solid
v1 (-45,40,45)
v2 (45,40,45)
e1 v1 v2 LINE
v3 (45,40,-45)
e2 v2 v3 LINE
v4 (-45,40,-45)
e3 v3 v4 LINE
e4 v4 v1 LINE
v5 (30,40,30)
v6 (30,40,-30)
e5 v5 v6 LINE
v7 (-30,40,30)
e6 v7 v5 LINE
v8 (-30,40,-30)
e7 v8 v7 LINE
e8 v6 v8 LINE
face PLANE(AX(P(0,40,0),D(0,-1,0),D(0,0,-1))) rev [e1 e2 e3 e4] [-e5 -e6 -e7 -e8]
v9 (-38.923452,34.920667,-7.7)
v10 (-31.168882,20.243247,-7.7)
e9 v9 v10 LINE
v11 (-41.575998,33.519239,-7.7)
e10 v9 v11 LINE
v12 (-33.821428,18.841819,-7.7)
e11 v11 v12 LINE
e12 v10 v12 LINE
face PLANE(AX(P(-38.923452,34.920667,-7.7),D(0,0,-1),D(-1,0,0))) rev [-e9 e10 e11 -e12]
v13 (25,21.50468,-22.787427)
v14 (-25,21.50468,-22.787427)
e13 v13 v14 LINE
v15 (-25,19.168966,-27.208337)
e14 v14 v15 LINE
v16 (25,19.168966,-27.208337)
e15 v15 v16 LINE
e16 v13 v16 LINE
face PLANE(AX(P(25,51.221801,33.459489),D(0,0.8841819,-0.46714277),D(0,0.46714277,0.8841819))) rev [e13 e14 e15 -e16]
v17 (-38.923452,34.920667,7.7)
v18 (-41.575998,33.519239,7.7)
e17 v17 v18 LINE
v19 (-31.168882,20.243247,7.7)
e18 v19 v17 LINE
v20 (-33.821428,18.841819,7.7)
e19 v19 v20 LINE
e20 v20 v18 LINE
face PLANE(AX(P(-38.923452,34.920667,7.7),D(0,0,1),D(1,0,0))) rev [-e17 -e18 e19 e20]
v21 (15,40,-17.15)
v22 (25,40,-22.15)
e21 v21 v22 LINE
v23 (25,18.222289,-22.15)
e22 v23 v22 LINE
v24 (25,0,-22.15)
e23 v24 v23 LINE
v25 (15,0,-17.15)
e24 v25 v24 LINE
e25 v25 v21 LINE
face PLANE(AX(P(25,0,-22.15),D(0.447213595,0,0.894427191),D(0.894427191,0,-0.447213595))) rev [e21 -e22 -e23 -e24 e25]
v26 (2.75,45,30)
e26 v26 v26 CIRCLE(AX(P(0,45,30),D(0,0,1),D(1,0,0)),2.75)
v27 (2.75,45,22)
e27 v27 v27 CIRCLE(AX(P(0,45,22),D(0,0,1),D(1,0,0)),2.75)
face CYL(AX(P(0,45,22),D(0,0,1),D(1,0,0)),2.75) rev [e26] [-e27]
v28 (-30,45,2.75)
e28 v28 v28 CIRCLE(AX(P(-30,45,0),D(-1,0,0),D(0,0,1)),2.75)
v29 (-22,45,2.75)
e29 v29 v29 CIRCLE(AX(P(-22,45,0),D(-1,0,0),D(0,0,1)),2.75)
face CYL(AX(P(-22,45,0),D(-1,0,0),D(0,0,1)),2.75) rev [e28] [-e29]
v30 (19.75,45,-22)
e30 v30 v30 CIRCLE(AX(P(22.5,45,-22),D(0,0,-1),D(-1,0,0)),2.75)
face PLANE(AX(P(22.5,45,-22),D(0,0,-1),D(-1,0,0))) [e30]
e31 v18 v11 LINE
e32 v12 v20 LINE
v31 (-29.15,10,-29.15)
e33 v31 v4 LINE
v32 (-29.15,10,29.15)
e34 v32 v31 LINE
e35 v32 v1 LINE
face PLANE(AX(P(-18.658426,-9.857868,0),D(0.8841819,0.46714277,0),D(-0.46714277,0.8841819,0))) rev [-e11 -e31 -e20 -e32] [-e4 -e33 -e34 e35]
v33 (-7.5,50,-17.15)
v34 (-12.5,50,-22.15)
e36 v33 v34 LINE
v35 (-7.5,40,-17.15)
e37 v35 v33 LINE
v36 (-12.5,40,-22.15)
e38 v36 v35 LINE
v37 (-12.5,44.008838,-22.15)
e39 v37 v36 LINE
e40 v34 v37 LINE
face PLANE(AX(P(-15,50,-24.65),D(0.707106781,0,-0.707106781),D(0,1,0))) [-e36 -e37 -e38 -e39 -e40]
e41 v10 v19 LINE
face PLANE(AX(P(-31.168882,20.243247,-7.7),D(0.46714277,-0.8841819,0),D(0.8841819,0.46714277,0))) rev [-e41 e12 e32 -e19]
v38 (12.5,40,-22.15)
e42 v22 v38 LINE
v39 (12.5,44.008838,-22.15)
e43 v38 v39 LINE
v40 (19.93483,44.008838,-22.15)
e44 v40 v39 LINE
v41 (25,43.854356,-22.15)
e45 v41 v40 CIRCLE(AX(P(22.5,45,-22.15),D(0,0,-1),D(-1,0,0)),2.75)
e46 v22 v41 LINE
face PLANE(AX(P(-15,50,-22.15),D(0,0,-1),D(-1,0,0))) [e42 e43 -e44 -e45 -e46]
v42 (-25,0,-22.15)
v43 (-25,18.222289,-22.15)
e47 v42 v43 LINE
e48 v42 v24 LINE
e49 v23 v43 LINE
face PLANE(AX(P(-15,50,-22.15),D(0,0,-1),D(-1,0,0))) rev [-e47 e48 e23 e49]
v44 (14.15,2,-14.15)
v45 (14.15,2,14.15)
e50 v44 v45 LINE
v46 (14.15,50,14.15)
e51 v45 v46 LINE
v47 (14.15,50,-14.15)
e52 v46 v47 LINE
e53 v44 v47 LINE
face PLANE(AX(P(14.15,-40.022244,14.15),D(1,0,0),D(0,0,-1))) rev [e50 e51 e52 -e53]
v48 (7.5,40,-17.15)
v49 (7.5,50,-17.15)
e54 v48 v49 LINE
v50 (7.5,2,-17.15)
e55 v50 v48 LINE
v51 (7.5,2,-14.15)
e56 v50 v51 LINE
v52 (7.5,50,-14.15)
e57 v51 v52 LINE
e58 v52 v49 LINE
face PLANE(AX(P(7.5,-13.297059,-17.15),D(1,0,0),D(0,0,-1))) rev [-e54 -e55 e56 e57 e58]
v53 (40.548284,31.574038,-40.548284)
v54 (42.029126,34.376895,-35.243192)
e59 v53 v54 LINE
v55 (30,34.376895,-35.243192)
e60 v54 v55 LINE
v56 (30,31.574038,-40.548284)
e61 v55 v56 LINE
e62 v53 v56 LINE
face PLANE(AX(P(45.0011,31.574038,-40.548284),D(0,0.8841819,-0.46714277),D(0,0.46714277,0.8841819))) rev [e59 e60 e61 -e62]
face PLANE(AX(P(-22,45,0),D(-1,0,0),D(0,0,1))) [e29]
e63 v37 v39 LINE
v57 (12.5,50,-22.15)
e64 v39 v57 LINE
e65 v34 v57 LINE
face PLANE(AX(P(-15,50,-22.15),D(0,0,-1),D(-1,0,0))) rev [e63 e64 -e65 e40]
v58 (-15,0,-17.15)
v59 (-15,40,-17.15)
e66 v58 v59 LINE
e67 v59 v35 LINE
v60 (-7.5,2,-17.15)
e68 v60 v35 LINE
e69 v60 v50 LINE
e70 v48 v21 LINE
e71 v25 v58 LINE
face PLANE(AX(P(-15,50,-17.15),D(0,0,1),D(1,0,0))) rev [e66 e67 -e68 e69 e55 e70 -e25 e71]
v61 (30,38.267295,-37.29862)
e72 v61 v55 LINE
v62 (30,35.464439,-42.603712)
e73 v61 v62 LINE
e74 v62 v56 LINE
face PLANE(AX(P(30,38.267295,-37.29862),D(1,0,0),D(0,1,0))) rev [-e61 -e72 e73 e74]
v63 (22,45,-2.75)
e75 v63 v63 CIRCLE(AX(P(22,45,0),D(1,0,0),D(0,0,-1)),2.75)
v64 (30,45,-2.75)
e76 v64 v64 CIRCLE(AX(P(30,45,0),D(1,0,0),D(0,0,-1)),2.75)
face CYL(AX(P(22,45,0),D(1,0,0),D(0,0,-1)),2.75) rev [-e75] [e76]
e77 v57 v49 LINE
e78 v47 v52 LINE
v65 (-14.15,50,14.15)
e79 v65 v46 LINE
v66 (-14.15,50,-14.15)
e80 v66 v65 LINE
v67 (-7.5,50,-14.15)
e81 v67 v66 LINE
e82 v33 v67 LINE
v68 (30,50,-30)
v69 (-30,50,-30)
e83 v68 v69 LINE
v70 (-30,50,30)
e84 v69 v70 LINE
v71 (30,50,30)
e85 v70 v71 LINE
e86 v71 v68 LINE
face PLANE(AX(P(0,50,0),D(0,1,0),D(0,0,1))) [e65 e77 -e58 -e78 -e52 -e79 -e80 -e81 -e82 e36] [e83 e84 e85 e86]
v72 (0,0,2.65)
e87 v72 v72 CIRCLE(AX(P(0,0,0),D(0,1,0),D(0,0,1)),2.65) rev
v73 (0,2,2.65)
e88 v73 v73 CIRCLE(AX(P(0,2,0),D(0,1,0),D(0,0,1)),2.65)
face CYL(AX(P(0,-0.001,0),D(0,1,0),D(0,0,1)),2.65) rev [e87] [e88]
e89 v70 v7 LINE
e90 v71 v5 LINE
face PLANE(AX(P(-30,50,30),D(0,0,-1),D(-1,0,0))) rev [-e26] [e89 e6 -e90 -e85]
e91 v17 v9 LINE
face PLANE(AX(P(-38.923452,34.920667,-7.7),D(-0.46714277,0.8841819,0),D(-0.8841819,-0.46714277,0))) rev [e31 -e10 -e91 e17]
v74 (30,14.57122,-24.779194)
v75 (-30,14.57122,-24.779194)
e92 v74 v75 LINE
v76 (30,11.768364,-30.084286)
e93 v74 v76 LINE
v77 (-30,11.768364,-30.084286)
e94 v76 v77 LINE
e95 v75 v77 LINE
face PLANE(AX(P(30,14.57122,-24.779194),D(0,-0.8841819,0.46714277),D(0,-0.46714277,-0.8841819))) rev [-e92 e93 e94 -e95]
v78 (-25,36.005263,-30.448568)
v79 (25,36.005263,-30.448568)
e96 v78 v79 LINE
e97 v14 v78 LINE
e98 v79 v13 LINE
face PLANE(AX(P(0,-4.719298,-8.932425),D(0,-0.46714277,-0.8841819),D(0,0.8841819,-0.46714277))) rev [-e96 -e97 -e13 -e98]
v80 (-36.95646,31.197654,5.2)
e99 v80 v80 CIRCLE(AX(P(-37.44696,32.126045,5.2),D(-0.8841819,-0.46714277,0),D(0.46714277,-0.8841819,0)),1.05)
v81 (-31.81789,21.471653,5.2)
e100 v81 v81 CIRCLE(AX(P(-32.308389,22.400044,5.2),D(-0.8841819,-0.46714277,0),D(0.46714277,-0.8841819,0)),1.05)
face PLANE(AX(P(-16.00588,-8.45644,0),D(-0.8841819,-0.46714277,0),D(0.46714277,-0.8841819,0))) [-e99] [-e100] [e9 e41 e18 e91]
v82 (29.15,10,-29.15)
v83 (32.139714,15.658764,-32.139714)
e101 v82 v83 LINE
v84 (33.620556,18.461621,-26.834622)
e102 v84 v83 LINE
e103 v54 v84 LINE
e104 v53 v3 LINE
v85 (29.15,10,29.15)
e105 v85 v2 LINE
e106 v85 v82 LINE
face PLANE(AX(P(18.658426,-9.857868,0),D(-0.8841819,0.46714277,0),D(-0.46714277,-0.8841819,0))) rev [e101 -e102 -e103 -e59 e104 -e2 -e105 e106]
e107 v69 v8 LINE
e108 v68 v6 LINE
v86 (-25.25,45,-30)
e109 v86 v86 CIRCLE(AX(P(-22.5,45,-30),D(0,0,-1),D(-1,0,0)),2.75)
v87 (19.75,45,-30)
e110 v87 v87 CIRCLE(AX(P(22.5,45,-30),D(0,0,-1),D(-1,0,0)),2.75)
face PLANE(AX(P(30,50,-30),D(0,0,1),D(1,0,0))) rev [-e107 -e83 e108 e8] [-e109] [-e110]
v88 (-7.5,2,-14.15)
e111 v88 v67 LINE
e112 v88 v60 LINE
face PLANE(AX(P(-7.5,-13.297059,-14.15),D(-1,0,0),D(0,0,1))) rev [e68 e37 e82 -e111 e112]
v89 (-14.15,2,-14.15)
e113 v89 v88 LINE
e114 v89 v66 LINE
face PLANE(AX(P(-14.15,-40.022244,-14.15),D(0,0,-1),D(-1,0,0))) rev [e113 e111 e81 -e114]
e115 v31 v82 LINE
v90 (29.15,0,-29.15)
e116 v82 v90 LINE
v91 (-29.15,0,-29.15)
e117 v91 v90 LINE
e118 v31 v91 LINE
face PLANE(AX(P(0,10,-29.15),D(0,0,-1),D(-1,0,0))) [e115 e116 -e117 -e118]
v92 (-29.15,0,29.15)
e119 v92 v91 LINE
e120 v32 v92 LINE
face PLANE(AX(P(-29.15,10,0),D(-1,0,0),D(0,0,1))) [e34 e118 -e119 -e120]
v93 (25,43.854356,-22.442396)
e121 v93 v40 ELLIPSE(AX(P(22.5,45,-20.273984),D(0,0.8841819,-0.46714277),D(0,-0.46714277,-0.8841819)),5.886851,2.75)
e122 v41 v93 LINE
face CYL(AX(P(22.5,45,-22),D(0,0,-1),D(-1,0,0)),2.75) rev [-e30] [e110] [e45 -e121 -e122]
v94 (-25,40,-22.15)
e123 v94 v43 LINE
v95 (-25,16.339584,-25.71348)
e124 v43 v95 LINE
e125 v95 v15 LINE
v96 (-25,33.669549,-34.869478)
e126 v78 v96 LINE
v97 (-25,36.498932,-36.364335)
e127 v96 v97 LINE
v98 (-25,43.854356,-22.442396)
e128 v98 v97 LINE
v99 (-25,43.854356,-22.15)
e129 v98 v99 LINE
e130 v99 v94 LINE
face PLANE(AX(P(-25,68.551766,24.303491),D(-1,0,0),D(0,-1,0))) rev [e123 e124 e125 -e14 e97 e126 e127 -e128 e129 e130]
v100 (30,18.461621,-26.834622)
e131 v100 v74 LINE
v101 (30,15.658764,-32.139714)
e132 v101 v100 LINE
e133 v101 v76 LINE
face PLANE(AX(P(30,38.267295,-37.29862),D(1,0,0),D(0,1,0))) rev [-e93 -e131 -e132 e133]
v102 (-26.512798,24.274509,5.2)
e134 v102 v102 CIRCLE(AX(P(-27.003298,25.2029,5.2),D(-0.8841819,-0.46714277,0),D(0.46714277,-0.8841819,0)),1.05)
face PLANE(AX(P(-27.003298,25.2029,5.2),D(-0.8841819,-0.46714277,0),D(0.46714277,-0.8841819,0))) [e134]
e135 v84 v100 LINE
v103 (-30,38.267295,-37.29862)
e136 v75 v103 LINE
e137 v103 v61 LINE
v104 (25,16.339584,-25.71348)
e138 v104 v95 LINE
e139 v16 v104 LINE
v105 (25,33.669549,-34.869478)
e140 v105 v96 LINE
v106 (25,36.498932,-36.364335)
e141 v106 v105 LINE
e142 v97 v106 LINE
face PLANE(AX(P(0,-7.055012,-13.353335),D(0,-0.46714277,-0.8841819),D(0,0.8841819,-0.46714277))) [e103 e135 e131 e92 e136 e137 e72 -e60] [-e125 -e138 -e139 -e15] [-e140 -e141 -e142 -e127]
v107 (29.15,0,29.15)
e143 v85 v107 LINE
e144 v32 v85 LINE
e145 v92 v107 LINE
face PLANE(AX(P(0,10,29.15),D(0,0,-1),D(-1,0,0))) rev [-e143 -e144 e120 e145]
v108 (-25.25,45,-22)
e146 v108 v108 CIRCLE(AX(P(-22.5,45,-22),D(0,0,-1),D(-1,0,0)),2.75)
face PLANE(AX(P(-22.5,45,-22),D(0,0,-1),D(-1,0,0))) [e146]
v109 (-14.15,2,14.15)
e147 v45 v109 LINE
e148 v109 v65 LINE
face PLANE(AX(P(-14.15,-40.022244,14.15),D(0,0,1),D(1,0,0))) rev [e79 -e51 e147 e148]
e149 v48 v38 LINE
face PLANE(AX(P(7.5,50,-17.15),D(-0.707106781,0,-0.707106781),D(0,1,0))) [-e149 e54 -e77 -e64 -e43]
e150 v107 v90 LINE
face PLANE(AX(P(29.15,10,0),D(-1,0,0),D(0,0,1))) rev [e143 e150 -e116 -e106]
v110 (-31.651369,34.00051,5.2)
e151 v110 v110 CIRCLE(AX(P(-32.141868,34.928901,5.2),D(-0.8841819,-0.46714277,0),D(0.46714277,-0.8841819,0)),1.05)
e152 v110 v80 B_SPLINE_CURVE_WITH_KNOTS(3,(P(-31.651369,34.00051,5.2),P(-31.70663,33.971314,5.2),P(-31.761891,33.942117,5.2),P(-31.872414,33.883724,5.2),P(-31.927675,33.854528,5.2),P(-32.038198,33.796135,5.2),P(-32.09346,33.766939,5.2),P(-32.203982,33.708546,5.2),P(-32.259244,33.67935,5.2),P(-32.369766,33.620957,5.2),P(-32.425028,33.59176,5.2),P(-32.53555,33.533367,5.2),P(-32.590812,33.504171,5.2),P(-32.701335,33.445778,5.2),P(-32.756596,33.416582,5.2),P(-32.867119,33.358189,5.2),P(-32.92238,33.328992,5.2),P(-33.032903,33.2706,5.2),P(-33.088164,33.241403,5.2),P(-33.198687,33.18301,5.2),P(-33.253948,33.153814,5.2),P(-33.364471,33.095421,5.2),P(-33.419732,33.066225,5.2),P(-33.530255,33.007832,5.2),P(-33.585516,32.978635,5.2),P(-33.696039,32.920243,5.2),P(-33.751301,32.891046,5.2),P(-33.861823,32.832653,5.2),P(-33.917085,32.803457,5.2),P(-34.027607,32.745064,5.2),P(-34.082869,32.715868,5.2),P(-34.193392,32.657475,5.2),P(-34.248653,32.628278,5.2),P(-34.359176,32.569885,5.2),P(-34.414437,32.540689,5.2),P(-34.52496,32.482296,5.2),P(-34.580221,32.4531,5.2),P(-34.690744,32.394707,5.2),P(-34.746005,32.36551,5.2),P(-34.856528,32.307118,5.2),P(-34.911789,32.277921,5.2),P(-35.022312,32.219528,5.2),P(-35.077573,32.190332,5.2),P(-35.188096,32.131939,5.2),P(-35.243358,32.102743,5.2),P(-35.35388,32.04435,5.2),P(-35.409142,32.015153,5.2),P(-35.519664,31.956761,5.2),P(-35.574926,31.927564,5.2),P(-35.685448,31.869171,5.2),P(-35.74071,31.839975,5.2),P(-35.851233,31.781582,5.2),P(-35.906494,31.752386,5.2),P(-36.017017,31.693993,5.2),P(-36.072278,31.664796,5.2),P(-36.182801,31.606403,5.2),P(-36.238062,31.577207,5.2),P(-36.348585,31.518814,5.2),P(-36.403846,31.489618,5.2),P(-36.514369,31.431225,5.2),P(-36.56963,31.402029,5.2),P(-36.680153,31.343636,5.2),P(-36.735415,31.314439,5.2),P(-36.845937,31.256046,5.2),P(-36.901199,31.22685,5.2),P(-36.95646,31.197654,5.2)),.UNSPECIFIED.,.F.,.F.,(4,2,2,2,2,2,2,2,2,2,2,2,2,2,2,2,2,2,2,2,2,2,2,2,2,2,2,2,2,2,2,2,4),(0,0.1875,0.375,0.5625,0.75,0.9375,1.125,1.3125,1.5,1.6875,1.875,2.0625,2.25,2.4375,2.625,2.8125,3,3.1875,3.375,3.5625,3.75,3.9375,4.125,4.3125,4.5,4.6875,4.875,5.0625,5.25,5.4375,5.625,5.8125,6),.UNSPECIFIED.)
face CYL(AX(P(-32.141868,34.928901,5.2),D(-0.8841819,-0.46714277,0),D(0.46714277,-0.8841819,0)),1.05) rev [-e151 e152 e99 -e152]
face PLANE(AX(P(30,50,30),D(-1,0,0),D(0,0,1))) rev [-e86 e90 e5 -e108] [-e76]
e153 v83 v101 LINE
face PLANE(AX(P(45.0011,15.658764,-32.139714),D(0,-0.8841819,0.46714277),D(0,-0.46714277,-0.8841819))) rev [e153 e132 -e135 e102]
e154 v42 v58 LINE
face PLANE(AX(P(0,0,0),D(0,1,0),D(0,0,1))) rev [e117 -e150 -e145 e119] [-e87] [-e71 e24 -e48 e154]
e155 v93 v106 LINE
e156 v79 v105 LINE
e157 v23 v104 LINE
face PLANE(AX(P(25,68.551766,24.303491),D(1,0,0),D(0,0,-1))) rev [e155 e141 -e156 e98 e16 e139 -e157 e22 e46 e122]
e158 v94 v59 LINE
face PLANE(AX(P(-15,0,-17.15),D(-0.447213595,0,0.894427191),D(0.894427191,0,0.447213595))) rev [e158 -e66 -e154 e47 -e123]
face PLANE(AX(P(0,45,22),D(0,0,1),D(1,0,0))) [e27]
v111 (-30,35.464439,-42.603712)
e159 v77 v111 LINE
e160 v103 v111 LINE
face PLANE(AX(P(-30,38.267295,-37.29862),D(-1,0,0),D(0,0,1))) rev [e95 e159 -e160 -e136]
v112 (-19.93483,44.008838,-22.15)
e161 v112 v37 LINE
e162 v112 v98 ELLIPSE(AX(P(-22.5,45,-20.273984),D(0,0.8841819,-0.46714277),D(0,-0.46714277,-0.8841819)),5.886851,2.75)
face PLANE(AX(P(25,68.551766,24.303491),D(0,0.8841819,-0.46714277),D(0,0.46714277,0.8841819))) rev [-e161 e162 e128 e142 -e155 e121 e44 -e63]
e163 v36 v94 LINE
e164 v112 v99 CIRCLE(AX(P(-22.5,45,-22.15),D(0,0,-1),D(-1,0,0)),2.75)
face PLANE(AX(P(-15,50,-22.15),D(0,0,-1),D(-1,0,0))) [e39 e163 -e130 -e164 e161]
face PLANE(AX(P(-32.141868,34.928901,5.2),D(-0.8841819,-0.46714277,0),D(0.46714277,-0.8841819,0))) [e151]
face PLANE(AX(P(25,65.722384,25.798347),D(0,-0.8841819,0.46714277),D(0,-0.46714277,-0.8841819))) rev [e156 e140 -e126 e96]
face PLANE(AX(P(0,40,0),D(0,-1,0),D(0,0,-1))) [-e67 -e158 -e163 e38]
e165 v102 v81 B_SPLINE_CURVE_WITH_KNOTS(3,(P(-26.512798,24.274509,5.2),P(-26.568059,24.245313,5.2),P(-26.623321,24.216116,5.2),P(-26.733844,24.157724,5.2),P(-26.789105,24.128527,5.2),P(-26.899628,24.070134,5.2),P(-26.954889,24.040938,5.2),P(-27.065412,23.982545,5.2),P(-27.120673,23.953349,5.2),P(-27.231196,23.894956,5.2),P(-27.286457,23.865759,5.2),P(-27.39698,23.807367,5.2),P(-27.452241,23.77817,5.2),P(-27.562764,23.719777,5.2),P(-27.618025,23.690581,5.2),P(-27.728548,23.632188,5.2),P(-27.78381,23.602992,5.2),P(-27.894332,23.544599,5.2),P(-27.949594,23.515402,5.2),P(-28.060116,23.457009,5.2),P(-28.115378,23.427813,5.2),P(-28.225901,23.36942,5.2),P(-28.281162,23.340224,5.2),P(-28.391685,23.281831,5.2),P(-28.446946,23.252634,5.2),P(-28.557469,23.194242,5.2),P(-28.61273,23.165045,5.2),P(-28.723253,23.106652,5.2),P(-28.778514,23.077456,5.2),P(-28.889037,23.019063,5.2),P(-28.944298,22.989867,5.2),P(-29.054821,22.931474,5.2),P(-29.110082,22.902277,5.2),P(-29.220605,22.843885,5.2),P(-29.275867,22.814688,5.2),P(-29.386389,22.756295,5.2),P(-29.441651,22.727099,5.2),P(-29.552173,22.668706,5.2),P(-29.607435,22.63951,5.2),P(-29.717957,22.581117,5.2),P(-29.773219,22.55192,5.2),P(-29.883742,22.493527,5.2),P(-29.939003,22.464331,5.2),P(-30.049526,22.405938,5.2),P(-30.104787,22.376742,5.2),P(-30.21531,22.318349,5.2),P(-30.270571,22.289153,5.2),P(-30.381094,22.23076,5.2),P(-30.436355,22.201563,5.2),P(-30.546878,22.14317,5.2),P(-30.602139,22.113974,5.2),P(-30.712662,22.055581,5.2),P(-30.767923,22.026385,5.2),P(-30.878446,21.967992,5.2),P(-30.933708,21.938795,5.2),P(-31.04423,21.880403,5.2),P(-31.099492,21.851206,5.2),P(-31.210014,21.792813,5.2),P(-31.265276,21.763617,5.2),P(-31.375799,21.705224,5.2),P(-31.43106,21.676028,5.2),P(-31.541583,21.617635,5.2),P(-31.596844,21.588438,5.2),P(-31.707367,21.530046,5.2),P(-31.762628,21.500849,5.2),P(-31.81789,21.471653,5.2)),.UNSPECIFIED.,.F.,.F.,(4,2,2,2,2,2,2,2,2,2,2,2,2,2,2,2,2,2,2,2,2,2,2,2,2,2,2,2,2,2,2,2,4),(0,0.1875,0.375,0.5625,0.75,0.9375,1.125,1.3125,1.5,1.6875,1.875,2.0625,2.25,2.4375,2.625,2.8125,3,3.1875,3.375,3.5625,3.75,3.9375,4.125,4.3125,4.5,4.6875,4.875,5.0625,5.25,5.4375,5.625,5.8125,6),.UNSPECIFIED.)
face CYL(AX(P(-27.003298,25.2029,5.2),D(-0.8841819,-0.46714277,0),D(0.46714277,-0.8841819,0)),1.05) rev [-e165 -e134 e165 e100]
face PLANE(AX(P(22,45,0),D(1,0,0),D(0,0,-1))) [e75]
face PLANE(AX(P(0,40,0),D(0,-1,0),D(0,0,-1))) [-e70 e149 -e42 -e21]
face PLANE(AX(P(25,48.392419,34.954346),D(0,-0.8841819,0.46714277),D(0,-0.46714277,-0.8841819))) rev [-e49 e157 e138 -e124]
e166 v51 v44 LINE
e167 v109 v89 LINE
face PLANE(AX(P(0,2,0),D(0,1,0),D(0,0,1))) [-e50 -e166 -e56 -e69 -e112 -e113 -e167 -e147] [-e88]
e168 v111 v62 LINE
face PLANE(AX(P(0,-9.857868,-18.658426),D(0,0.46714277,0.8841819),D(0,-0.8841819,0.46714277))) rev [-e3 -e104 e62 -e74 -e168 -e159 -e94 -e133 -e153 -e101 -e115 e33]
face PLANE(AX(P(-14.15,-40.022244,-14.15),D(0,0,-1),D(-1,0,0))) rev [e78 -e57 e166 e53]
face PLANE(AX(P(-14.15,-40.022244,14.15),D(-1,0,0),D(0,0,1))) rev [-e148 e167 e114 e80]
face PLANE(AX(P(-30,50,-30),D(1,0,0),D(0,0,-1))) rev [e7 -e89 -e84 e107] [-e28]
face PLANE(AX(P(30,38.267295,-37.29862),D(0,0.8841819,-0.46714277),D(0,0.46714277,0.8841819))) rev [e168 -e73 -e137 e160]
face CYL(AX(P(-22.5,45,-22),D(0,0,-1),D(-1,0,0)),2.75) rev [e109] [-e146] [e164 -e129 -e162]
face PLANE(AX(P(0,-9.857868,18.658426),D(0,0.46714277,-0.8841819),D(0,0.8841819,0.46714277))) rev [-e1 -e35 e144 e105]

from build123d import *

# Parameters (mm, degrees)
SKETCH1_W           = 58.3
SKETCH1_H           = 58.3
SKETCH1_W_2         = 28.3
SKETCH1_H_2         = 28.3
BOSS_EXTRUDE1_DEPTH = 10
SKETCH4_W           = 60
SKETCH4_H           = 60
BOSS_EXTRUDE2_DEPTH = 10
SKETCH6_W           = 60
SKETCH6_H           = 26.8
ESP32_DEPTH         = 6
SKETCH8_W           = 28.3
SKETCH8_H           = 28.3
CUT_EXTRUDE3_DEPTH  = 48
SKETCH10_W          = 30
SKETCH10_H          = 5
CUT_EXTRUDE5_DEPTH  = 50
CUT_EXTRUDE2_REACH  = 95.195
SKETCH7_W           = 50
SKETCH7_H           = 3.2
CUT_EXTRUDE6_START  = -10
CUT_EXTRUDE6_DEPTH  = 71.932070392
CUT_EXTRUDE7_START  = -25
CUT_EXTRUDE7_DEPTH  = 50
CUT_EXTRUDE8_REACH  = 102.747
SKETCH14_W          = 15
SKETCH14_H          = 3
CUT_EXTRUDE9_DEPTH  = 48
CHAMFER1_SIZE       = 7.5
CUT_EXTRUDE10_REACH = 81.712
SKETCH15_R          = 2.65
SKETCH16_W          = 15.4
SKETCH16_H          = 16.6
CANBUS_DEPTH        = 3
SKETCH18_R          = 1.05
M2_CANBUS_DEPTH     = 6
SKETCH19_R          = 2.75
CUT_EXTRUDE13_DEPTH = 8
SKETCH20_R          = 2.75
CUT_EXTRUDE14_DEPTH = 8
SKETCH21_R          = 2.75
CUT_EXTRUDE15_DEPTH = 8
CUT_EXTRUDE16_START = -8
SKETCH22_R          = 2.75
CUT_EXTRUDE16_DEPTH = 8


# Read off the part's stored shape, not the designer's step: Cut-Extrude7
with BuildPart() as part:
    # Sketch1 → Boss-Extrude1 (new body)
    # profile 1 of 2: a face of its own
    with BuildSketch(Plane(origin=(0, 0, 0), x_dir=(1, 0, 0), z_dir=(0, 1, 0))):
        Rectangle(SKETCH1_W, SKETCH1_H)
        Rectangle(SKETCH1_W_2, SKETCH1_H_2, mode=Mode.SUBTRACT)
    # profile 2 of 2: a face of its own
    with BuildSketch(Plane(origin=(0, 0, 0), x_dir=(1, 0, 0), z_dir=(0, 1, 0))):
        Rectangle(SKETCH1_W_2, SKETCH1_H_2)
    extrude(amount=BOSS_EXTRUDE1_DEPTH)

    # Sketch2 → section 1 of loft1
    with BuildSketch(Plane(origin=(0, 40, 0), x_dir=(1, 0, 0), z_dir=(0, 1, 0)), mode=Mode.PRIVATE) as loft1_s1:
        with BuildLine():
            Line((-45, -45), (45, -45))
            Line((45, -45), (45, 45))
            Line((45, 45), (-45, 45))
            Line((-45, 45), (-45, -45))
        make_face()
    # loft from a face of the part (loft1)
    loft([part.faces().sort_by_distance((0, 10, 0))[0], loft1_s1.sketch])

    # Sketch4 → Boss-Extrude2 (add)
    with BuildSketch(Plane(origin=(0, 40, 0), x_dir=(1, 0, 0), z_dir=(0, 1, 0))):
        Rectangle(SKETCH4_W, SKETCH4_H)
    extrude(amount=BOSS_EXTRUDE2_DEPTH)

    # Sketch6 → ESP32 (cut)
    with BuildSketch(Plane(origin=(0, -9.857868483, -18.658426151), x_dir=(-1, 0, 0), z_dir=(0, -0.4671427704257183, -0.8841818998594039))):
        with Locations((0, 37.859030757)):
            Rectangle(SKETCH6_W, SKETCH6_H)
    extrude(amount=-ESP32_DEPTH, mode=Mode.SUBTRACT)

    # Sketch8 → Cut-Extrude3 (cut)
    with BuildSketch(Plane(origin=(0, 50, 0), x_dir=(1, 0, 0), z_dir=(0, 1, 0))):
        Rectangle(SKETCH8_W, SKETCH8_H)
    extrude(amount=-CUT_EXTRUDE3_DEPTH, mode=Mode.SUBTRACT)

    # Sketch10 → Cut-Extrude5 (cut)
    with BuildSketch(Plane(origin=(0, 0, 0), x_dir=(-1, 0, 0), z_dir=(0, -1, 0))):
        with Locations((0, 19.65)):
            Rectangle(SKETCH10_W, SKETCH10_H)
    extrude(amount=-CUT_EXTRUDE5_DEPTH, mode=Mode.SUBTRACT)

    # Cut-Extrude2: up to this plane
    cut_extrude2_end = Plane(origin=(-15, 50, -22.15), z_dir=(0, 0, -1))
    # Sketch7 → Cut-Extrude2 (cut, up to the surface)
    with BuildSketch(Plane(origin=(0, -7.055011861, -13.353334752), x_dir=(-1, 0, 0), z_dir=(0, -0.46714277042571845, -0.8841818998594037)), mode=Mode.PRIVATE) as cut_extrude2_sk1:
        with Locations((0, 47.659030757)):
            Rectangle(SKETCH7_W, SKETCH7_H)
    cut_extrude2_tool1 = split(extrude(cut_extrude2_sk1.sketch, amount=-CUT_EXTRUDE2_REACH, mode=Mode.PRIVATE), bisect_by=cut_extrude2_end, keep=Keep.BOTH, mode=Mode.PRIVATE)
    add(cut_extrude2_tool1.solids().sort_by_distance((0, 35.08424, -35.616906))[0], mode=Mode.SUBTRACT)
    # Sketch7 → Cut-Extrude2 (cut, up to the surface)
    with BuildSketch(Plane(origin=(0, -7.055011861, -13.353334752), x_dir=(-1, 0, 0), z_dir=(0, -0.46714277042571845, -0.8841818998594037)), mode=Mode.PRIVATE) as cut_extrude2_sk2:
        with Locations((0, 28.059030757)):
            Rectangle(SKETCH7_W, SKETCH7_H)
    cut_extrude2_tool2 = split(extrude(cut_extrude2_sk2.sketch, amount=-CUT_EXTRUDE2_REACH, mode=Mode.PRIVATE), bisect_by=cut_extrude2_end, keep=Keep.BOTH, mode=Mode.PRIVATE)
    add(cut_extrude2_tool2.solids().sort_by_distance((0, 17.754275, -26.460908))[0], mode=Mode.SUBTRACT)

    # Sketch11 → Cut-Extrude6 (cut, through all)
    with BuildSketch(Plane(origin=(0, 50, 0), x_dir=(1, 0, 0), z_dir=(0, 1, 0)).offset(CUT_EXTRUDE6_START)):
        Polygon((-25, 22.15), (25, 22.15), (15, 17.15), (-15, 17.15), align=None)
    extrude(amount=-CUT_EXTRUDE6_DEPTH, mode=Mode.SUBTRACT)

    # Cut-Extrude7 outline → Cut-Extrude7 (cut)
    with BuildSketch(Plane.YZ.offset(CUT_EXTRUDE7_START)):
        Polygon((40.38967366, -22.15), (21.841454111, -22.15), (21.504680154, -22.787427049), (36.005263311, -30.448568484), align=None)
    extrude(amount=CUT_EXTRUDE7_DEPTH, mode=Mode.SUBTRACT)

    # Cut-Extrude8: up to this plane
    cut_extrude8_end = Plane(origin=(18.658426151, -9.857868483, 0), z_dir=(-0.884181899859404, 0.4671427704257181, 0))
    # Sketch13 → Cut-Extrude8 (cut, up to the surface)
    with BuildSketch(Plane.ZY.offset(-30), mode=Mode.PRIVATE) as cut_extrude8_sk1:
        Polygon((-32.139713731, 15.658764159), (-40.548283598, 31.574038357), (-35.243192199, 34.376894979), (-26.834622332, 18.461620782), align=None)
    cut_extrude8_tool1 = split(extrude(cut_extrude8_sk1.sketch, amount=-CUT_EXTRUDE8_REACH, mode=Mode.PRIVATE), bisect_by=cut_extrude8_end, keep=Keep.BOTH, mode=Mode.PRIVATE)
    add(cut_extrude8_tool1.solids().sort_by_distance((30, 25.01783, -33.691453))[0], mode=Mode.SUBTRACT)

    # Sketch14 → Cut-Extrude9 (cut)
    with BuildSketch(Plane(origin=(0, 50, 0), x_dir=(1, 0, 0), z_dir=(0, 1, 0))):
        with Locations((0, 15.65)):
            Rectangle(SKETCH14_W, SKETCH14_H)
    extrude(amount=-CUT_EXTRUDE9_DEPTH, mode=Mode.SUBTRACT)

    # Chamfer1
    # the kernel refuses this chamfer: 7.5 mm, written as the material it adds along each edge
    with BuildSketch(Plane(origin=(15, 40, -17.15), x_dir=(-0.9996219169112968, 0, 0.02749587661058632), z_dir=(0, 1, 0))) as chamfer1_piece_1_section:
        Polygon((CHAMFER1_SIZE * 0.999621916911, -CHAMFER1_SIZE * 0.0274958766106), (-CHAMFER1_SIZE * 0.0274958766106, -CHAMFER1_SIZE * 0.999621916911), (0, 0), align=None)
    chamfer1_piece_1 = extrude(amount=10, mode=Mode.PRIVATE)
    chamfer1_piece_1 = split(chamfer1_piece_1, bisect_by=Plane(origin=(12.200765376, 42.822931518, -22.15), z_dir=(0, 0, 1)), keep=Keep.TOP, mode=Mode.PRIVATE)
    add(chamfer1_piece_1)
    with BuildSketch(Plane(origin=(-15, 40, -17.15), x_dir=(0.9996219169112968, 0, 0.02749587661058632), z_dir=(0, 1, 0))) as chamfer1_piece_2_section:
        Polygon((CHAMFER1_SIZE * 0.999621916911, CHAMFER1_SIZE * 0.0274958766106), (-CHAMFER1_SIZE * 0.0274958766106, CHAMFER1_SIZE * 0.999621916911), (0, 0), align=None)
    chamfer1_piece_2 = extrude(amount=10, mode=Mode.PRIVATE)
    chamfer1_piece_2 = split(chamfer1_piece_2, bisect_by=Plane(origin=(-12.200765376, 42.822931518, -22.15), z_dir=(0, 0, 1)), keep=Keep.TOP, mode=Mode.PRIVATE)
    add(chamfer1_piece_2)

    # Sketch15 → Cut-Extrude10 (cut, up to next)
    with BuildSketch(Plane(origin=(0, 2, 0), x_dir=(1, 0, 0), z_dir=(0, 1, 0)), mode=Mode.PRIVATE) as cut_extrude10_sk1:
        with Locations(Location((0, 0, 0), (0, 0, 270))):
            Circle(SKETCH15_R)
    cut_extrude10_tool1 = extrude(cut_extrude10_sk1.sketch, amount=-CUT_EXTRUDE10_REACH, mode=Mode.PRIVATE) & part.part
    add(cut_extrude10_tool1.solids().sort_by_distance((0, 2, 0))[0], mode=Mode.SUBTRACT)

    # Sketch16 → CANbus (cut)
    with BuildSketch(Plane(origin=(-18.658426151, -9.857868483, 0), x_dir=(0, 0, 1), z_dir=(-0.8841818998594037, -0.46714277042571845, 0))):
        with Locations((0, 40.759030757)):
            Rectangle(SKETCH16_W, SKETCH16_H)
    extrude(amount=-CANBUS_DEPTH, mode=Mode.SUBTRACT)

    # Sketch18 → M2-CANbus (cut)
    with BuildSketch(Plane(origin=(-16.005880452, -8.456440172, 0), x_dir=(0, 0, 1), z_dir=(-0.8841818998594035, -0.46714277042571867, 0))):
        with Locations(Location((5.2, 45.898343703, 0), (0, 0, 270))):
            Circle(SKETCH18_R)
        with Locations(Location((5.2, 34.898343703, 0), (0, 0, 270))):
            Circle(SKETCH18_R)
    extrude(amount=-M2_CANBUS_DEPTH, mode=Mode.SUBTRACT)

    # Sketch19 → Cut-Extrude13 (cut)
    with BuildSketch(Plane(origin=(0, 0, -30), x_dir=(-1, 0, 0), z_dir=(0, 0, -1))):
        with Locations((-22.5, 45)):
            Circle(SKETCH19_R)
        with Locations((22.5, 45)):
            Circle(SKETCH19_R)
    extrude(amount=-CUT_EXTRUDE13_DEPTH, mode=Mode.SUBTRACT)

    # Sketch20 → Cut-Extrude14 (cut)
    with BuildSketch(Plane(origin=(30, 0, 0), x_dir=(0, 0, -1), z_dir=(1, 0, 0))):
        with Locations((0, 45)):
            Circle(SKETCH20_R)
    extrude(amount=-CUT_EXTRUDE14_DEPTH, mode=Mode.SUBTRACT)

    # Sketch21 → Cut-Extrude15 (cut)
    with BuildSketch(Plane.XY.offset(30)):
        with Locations((0, 45)):
            Circle(SKETCH21_R)
    extrude(amount=-CUT_EXTRUDE15_DEPTH, mode=Mode.SUBTRACT)

    # Sketch22 → Cut-Extrude16 (cut)
    with BuildSketch(Plane.ZY.offset(30).offset(CUT_EXTRUDE16_START)):
        with Locations(Location((0, 45, 0), (0, 0, 180))):
            Circle(SKETCH22_R)
    extrude(amount=CUT_EXTRUDE16_DEPTH, mode=Mode.SUBTRACT)


solid = part.part
